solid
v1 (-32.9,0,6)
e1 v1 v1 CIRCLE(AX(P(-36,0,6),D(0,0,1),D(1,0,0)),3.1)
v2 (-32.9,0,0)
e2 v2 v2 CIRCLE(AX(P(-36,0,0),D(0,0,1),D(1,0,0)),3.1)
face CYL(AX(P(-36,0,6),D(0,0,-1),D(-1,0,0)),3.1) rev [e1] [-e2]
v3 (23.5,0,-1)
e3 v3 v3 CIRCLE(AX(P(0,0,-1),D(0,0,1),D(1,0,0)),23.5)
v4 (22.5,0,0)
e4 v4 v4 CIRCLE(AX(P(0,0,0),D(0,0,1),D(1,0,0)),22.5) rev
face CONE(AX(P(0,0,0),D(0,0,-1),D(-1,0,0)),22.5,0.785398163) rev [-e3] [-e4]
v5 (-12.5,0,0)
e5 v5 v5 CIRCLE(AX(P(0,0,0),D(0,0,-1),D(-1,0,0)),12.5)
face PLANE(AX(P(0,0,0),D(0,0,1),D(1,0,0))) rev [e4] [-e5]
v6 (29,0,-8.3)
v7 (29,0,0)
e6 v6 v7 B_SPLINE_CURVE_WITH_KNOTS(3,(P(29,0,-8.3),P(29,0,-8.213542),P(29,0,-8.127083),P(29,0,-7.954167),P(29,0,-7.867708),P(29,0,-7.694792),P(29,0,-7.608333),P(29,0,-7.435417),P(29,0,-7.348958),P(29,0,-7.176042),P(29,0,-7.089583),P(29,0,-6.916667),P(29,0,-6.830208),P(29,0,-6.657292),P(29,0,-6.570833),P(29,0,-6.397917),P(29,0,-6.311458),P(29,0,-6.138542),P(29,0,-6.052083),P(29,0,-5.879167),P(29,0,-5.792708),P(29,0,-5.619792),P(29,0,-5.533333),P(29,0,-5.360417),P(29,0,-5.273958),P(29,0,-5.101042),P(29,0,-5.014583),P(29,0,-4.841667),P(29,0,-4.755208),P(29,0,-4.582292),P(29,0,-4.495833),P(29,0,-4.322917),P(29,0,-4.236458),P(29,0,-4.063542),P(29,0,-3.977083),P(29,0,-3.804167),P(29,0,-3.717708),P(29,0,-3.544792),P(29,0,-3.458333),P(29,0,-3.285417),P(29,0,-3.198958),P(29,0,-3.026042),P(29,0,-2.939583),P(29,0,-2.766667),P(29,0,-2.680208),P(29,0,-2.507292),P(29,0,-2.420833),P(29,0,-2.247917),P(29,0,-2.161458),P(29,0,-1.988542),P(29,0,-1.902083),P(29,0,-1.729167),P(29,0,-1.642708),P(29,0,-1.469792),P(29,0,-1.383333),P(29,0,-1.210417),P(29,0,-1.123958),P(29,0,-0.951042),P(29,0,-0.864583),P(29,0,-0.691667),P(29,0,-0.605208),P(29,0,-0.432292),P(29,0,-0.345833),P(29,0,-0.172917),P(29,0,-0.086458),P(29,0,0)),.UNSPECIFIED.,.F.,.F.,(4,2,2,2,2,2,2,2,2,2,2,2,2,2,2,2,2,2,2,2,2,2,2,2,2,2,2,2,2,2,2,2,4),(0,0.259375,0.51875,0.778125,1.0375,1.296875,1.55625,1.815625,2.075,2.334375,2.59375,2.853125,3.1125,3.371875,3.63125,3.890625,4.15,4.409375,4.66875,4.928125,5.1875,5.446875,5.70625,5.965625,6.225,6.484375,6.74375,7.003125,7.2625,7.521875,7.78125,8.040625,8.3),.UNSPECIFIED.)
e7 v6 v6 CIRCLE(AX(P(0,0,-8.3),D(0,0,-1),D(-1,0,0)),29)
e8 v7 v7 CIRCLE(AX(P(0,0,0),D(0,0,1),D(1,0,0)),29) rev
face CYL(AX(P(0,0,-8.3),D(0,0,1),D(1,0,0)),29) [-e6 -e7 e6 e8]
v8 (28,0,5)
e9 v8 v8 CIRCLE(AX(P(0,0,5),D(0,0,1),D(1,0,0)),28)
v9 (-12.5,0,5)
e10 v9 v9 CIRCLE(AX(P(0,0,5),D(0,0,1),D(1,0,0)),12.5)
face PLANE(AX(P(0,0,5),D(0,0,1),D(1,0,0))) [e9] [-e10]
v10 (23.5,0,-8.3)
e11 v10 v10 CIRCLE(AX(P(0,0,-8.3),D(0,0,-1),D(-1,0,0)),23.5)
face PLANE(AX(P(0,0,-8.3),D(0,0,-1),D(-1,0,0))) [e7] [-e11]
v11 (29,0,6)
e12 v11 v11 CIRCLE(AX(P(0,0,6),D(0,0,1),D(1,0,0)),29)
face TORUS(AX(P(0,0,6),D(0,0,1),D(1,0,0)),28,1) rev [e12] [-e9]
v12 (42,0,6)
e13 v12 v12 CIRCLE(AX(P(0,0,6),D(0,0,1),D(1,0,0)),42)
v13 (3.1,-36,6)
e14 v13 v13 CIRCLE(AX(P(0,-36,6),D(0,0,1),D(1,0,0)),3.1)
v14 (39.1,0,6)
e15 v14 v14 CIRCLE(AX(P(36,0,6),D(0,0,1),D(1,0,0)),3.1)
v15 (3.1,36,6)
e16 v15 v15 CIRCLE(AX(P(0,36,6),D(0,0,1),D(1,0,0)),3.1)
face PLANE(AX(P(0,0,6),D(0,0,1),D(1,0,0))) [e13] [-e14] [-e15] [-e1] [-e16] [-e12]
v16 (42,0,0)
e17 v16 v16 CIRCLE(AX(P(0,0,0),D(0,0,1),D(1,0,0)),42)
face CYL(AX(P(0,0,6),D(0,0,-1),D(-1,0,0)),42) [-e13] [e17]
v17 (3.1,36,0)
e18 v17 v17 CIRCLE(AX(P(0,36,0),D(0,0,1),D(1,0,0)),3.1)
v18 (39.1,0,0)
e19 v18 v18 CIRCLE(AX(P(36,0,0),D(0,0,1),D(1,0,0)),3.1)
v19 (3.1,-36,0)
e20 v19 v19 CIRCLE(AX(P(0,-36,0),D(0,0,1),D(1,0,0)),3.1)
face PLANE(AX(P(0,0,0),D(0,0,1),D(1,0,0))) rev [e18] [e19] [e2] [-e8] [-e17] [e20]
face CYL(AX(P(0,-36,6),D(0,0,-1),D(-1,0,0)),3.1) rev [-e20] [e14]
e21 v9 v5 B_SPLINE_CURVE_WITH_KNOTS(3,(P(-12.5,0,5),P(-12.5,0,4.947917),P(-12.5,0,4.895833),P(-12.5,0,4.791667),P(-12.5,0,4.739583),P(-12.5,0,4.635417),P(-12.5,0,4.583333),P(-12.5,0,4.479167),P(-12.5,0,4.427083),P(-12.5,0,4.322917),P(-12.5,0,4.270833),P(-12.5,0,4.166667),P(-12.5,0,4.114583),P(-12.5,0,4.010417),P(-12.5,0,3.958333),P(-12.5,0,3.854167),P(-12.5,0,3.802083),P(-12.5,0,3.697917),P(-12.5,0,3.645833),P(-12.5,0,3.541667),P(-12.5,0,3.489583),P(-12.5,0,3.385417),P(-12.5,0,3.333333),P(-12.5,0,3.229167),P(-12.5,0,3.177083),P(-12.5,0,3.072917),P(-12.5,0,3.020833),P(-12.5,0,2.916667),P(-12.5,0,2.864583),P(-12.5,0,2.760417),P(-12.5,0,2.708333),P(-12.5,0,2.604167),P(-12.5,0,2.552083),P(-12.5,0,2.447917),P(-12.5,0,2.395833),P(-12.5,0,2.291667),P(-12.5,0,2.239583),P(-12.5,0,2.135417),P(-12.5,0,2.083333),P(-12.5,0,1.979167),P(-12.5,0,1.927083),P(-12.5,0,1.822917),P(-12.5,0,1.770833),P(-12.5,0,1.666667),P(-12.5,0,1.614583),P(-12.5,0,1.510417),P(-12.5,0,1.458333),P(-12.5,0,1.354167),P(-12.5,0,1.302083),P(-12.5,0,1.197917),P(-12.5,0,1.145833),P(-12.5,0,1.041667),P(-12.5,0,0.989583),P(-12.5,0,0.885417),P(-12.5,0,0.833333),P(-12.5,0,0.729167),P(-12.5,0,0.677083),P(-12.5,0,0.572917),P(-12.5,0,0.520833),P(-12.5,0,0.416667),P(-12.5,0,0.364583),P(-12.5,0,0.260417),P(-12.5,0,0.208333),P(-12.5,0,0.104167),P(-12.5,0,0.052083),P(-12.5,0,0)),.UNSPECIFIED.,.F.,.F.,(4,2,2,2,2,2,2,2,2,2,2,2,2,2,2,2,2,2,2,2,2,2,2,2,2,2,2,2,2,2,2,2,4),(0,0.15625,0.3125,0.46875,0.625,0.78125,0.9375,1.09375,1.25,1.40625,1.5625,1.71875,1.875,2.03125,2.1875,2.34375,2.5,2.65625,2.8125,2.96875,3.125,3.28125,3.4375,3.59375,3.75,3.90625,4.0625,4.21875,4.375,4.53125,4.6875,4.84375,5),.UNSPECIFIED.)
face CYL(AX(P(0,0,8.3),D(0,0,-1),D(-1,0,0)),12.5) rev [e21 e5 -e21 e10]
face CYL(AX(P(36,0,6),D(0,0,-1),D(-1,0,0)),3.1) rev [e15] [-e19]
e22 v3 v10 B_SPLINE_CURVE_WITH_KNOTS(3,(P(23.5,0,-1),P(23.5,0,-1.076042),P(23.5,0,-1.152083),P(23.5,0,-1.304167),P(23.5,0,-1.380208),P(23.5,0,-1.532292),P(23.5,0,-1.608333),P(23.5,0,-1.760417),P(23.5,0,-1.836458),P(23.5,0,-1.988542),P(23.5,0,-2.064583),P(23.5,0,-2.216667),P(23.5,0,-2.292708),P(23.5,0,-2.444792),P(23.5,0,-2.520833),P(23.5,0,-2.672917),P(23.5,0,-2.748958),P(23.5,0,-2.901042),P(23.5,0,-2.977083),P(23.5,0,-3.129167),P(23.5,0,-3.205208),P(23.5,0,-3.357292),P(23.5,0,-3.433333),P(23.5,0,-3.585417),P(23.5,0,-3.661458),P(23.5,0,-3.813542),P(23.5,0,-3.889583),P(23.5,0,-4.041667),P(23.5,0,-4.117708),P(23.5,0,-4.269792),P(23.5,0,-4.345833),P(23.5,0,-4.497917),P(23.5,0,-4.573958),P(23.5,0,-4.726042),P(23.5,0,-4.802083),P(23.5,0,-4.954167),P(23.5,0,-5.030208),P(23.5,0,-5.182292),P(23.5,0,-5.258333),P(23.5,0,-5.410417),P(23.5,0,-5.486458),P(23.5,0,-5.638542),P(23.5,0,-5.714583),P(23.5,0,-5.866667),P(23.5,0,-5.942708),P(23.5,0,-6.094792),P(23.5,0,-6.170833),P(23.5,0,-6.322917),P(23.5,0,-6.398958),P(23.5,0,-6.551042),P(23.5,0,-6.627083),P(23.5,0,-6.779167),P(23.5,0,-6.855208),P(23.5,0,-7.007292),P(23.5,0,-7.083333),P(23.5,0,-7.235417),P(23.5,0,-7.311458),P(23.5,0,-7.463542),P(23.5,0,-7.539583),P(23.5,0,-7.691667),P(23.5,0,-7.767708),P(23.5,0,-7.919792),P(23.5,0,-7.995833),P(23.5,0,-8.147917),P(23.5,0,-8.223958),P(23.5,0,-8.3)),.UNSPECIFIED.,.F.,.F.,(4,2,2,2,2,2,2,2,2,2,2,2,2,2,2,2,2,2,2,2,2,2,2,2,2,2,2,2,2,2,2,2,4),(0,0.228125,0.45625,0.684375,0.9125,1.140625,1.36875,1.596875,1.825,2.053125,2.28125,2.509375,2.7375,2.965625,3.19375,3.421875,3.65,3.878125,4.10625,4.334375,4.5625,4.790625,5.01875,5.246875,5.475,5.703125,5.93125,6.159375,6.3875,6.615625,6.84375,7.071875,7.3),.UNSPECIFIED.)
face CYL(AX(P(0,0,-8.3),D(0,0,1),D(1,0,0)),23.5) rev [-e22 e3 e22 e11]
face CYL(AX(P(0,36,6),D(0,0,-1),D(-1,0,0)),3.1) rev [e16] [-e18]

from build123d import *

# Parameters (mm, degrees)
SKETCH_1_R          = 42
SKETCH_1_R_2        = 3.1
EXTRUDE_1_DEPTH     = 6
SKETCH_2_R          = 29
CUT_EXTRUDE_1_DEPTH = 1
FILLET_3_R          = 1
SKETCH_3_R          = 29
SKETCH_3_R_2        = 23.5
EXTRUDE_2_DEPTH     = 8.3
CHAMFER_1_SIZE      = 1
SKETCH_4_R          = 12.5
CUT_EXTRUDE_2_DEPTH = 8.3


with BuildPart() as part:
    # Эскиз1 → Бобышка-Вытянуть1 (new body)
    with BuildSketch(Plane.XY):
        Circle(SKETCH_1_R)
        with Locations((0, 36)):
            Circle(SKETCH_1_R_2, mode=Mode.SUBTRACT)
        with Locations((36, 0)):
            Circle(SKETCH_1_R_2, mode=Mode.SUBTRACT)
        with Locations((0, -36)):
            Circle(SKETCH_1_R_2, mode=Mode.SUBTRACT)
        with Locations((-36, 0)):
            Circle(SKETCH_1_R_2, mode=Mode.SUBTRACT)
    extrude(amount=EXTRUDE_1_DEPTH)

    # Эскиз2 → Вырез-Вытянуть1 (cut)
    with BuildSketch(Plane.XY.offset(6)):
        Circle(SKETCH_2_R)
    extrude(amount=-CUT_EXTRUDE_1_DEPTH, mode=Mode.SUBTRACT)

    # Скругление3
    fillet_3_edges = [part.edges().sort_by_distance(p)[0] for p in [
        (-29, 0, 5),
    ]]
    fillet(fillet_3_edges, radius=FILLET_3_R - 0.0001)  # a hair under: the kernel refuses the full size

    # Эскиз3 → Бобышка-Вытянуть2 (add)
    with BuildSketch(Plane(origin=(0, 0, 0), x_dir=(-1, 0, 0), z_dir=(0, 0, -1))):
        with Locations(Location((0, 0, 0), (0, 0, 180))):
            Circle(SKETCH_3_R)
        with Locations(Location((0, 0, 0), (0, 0, 180))):
            Circle(SKETCH_3_R_2, mode=Mode.SUBTRACT)
    extrude(amount=EXTRUDE_2_DEPTH)

    # Фаска1
    chamfer_1_edges = [part.edges().sort_by_distance(p)[0] for p in [
        (-23.5, 0, 0),
    ]]
    chamfer(chamfer_1_edges, length=CHAMFER_1_SIZE)

    # Эскиз4 → Вырез-Вытянуть2 (cut)
    with BuildSketch(Plane(origin=(0, 0, 0), x_dir=(-1, 0, 0), z_dir=(0, 0, -1))):
        Circle(SKETCH_4_R)
    extrude(amount=-CUT_EXTRUDE_2_DEPTH, mode=Mode.SUBTRACT)


solid = part.part
